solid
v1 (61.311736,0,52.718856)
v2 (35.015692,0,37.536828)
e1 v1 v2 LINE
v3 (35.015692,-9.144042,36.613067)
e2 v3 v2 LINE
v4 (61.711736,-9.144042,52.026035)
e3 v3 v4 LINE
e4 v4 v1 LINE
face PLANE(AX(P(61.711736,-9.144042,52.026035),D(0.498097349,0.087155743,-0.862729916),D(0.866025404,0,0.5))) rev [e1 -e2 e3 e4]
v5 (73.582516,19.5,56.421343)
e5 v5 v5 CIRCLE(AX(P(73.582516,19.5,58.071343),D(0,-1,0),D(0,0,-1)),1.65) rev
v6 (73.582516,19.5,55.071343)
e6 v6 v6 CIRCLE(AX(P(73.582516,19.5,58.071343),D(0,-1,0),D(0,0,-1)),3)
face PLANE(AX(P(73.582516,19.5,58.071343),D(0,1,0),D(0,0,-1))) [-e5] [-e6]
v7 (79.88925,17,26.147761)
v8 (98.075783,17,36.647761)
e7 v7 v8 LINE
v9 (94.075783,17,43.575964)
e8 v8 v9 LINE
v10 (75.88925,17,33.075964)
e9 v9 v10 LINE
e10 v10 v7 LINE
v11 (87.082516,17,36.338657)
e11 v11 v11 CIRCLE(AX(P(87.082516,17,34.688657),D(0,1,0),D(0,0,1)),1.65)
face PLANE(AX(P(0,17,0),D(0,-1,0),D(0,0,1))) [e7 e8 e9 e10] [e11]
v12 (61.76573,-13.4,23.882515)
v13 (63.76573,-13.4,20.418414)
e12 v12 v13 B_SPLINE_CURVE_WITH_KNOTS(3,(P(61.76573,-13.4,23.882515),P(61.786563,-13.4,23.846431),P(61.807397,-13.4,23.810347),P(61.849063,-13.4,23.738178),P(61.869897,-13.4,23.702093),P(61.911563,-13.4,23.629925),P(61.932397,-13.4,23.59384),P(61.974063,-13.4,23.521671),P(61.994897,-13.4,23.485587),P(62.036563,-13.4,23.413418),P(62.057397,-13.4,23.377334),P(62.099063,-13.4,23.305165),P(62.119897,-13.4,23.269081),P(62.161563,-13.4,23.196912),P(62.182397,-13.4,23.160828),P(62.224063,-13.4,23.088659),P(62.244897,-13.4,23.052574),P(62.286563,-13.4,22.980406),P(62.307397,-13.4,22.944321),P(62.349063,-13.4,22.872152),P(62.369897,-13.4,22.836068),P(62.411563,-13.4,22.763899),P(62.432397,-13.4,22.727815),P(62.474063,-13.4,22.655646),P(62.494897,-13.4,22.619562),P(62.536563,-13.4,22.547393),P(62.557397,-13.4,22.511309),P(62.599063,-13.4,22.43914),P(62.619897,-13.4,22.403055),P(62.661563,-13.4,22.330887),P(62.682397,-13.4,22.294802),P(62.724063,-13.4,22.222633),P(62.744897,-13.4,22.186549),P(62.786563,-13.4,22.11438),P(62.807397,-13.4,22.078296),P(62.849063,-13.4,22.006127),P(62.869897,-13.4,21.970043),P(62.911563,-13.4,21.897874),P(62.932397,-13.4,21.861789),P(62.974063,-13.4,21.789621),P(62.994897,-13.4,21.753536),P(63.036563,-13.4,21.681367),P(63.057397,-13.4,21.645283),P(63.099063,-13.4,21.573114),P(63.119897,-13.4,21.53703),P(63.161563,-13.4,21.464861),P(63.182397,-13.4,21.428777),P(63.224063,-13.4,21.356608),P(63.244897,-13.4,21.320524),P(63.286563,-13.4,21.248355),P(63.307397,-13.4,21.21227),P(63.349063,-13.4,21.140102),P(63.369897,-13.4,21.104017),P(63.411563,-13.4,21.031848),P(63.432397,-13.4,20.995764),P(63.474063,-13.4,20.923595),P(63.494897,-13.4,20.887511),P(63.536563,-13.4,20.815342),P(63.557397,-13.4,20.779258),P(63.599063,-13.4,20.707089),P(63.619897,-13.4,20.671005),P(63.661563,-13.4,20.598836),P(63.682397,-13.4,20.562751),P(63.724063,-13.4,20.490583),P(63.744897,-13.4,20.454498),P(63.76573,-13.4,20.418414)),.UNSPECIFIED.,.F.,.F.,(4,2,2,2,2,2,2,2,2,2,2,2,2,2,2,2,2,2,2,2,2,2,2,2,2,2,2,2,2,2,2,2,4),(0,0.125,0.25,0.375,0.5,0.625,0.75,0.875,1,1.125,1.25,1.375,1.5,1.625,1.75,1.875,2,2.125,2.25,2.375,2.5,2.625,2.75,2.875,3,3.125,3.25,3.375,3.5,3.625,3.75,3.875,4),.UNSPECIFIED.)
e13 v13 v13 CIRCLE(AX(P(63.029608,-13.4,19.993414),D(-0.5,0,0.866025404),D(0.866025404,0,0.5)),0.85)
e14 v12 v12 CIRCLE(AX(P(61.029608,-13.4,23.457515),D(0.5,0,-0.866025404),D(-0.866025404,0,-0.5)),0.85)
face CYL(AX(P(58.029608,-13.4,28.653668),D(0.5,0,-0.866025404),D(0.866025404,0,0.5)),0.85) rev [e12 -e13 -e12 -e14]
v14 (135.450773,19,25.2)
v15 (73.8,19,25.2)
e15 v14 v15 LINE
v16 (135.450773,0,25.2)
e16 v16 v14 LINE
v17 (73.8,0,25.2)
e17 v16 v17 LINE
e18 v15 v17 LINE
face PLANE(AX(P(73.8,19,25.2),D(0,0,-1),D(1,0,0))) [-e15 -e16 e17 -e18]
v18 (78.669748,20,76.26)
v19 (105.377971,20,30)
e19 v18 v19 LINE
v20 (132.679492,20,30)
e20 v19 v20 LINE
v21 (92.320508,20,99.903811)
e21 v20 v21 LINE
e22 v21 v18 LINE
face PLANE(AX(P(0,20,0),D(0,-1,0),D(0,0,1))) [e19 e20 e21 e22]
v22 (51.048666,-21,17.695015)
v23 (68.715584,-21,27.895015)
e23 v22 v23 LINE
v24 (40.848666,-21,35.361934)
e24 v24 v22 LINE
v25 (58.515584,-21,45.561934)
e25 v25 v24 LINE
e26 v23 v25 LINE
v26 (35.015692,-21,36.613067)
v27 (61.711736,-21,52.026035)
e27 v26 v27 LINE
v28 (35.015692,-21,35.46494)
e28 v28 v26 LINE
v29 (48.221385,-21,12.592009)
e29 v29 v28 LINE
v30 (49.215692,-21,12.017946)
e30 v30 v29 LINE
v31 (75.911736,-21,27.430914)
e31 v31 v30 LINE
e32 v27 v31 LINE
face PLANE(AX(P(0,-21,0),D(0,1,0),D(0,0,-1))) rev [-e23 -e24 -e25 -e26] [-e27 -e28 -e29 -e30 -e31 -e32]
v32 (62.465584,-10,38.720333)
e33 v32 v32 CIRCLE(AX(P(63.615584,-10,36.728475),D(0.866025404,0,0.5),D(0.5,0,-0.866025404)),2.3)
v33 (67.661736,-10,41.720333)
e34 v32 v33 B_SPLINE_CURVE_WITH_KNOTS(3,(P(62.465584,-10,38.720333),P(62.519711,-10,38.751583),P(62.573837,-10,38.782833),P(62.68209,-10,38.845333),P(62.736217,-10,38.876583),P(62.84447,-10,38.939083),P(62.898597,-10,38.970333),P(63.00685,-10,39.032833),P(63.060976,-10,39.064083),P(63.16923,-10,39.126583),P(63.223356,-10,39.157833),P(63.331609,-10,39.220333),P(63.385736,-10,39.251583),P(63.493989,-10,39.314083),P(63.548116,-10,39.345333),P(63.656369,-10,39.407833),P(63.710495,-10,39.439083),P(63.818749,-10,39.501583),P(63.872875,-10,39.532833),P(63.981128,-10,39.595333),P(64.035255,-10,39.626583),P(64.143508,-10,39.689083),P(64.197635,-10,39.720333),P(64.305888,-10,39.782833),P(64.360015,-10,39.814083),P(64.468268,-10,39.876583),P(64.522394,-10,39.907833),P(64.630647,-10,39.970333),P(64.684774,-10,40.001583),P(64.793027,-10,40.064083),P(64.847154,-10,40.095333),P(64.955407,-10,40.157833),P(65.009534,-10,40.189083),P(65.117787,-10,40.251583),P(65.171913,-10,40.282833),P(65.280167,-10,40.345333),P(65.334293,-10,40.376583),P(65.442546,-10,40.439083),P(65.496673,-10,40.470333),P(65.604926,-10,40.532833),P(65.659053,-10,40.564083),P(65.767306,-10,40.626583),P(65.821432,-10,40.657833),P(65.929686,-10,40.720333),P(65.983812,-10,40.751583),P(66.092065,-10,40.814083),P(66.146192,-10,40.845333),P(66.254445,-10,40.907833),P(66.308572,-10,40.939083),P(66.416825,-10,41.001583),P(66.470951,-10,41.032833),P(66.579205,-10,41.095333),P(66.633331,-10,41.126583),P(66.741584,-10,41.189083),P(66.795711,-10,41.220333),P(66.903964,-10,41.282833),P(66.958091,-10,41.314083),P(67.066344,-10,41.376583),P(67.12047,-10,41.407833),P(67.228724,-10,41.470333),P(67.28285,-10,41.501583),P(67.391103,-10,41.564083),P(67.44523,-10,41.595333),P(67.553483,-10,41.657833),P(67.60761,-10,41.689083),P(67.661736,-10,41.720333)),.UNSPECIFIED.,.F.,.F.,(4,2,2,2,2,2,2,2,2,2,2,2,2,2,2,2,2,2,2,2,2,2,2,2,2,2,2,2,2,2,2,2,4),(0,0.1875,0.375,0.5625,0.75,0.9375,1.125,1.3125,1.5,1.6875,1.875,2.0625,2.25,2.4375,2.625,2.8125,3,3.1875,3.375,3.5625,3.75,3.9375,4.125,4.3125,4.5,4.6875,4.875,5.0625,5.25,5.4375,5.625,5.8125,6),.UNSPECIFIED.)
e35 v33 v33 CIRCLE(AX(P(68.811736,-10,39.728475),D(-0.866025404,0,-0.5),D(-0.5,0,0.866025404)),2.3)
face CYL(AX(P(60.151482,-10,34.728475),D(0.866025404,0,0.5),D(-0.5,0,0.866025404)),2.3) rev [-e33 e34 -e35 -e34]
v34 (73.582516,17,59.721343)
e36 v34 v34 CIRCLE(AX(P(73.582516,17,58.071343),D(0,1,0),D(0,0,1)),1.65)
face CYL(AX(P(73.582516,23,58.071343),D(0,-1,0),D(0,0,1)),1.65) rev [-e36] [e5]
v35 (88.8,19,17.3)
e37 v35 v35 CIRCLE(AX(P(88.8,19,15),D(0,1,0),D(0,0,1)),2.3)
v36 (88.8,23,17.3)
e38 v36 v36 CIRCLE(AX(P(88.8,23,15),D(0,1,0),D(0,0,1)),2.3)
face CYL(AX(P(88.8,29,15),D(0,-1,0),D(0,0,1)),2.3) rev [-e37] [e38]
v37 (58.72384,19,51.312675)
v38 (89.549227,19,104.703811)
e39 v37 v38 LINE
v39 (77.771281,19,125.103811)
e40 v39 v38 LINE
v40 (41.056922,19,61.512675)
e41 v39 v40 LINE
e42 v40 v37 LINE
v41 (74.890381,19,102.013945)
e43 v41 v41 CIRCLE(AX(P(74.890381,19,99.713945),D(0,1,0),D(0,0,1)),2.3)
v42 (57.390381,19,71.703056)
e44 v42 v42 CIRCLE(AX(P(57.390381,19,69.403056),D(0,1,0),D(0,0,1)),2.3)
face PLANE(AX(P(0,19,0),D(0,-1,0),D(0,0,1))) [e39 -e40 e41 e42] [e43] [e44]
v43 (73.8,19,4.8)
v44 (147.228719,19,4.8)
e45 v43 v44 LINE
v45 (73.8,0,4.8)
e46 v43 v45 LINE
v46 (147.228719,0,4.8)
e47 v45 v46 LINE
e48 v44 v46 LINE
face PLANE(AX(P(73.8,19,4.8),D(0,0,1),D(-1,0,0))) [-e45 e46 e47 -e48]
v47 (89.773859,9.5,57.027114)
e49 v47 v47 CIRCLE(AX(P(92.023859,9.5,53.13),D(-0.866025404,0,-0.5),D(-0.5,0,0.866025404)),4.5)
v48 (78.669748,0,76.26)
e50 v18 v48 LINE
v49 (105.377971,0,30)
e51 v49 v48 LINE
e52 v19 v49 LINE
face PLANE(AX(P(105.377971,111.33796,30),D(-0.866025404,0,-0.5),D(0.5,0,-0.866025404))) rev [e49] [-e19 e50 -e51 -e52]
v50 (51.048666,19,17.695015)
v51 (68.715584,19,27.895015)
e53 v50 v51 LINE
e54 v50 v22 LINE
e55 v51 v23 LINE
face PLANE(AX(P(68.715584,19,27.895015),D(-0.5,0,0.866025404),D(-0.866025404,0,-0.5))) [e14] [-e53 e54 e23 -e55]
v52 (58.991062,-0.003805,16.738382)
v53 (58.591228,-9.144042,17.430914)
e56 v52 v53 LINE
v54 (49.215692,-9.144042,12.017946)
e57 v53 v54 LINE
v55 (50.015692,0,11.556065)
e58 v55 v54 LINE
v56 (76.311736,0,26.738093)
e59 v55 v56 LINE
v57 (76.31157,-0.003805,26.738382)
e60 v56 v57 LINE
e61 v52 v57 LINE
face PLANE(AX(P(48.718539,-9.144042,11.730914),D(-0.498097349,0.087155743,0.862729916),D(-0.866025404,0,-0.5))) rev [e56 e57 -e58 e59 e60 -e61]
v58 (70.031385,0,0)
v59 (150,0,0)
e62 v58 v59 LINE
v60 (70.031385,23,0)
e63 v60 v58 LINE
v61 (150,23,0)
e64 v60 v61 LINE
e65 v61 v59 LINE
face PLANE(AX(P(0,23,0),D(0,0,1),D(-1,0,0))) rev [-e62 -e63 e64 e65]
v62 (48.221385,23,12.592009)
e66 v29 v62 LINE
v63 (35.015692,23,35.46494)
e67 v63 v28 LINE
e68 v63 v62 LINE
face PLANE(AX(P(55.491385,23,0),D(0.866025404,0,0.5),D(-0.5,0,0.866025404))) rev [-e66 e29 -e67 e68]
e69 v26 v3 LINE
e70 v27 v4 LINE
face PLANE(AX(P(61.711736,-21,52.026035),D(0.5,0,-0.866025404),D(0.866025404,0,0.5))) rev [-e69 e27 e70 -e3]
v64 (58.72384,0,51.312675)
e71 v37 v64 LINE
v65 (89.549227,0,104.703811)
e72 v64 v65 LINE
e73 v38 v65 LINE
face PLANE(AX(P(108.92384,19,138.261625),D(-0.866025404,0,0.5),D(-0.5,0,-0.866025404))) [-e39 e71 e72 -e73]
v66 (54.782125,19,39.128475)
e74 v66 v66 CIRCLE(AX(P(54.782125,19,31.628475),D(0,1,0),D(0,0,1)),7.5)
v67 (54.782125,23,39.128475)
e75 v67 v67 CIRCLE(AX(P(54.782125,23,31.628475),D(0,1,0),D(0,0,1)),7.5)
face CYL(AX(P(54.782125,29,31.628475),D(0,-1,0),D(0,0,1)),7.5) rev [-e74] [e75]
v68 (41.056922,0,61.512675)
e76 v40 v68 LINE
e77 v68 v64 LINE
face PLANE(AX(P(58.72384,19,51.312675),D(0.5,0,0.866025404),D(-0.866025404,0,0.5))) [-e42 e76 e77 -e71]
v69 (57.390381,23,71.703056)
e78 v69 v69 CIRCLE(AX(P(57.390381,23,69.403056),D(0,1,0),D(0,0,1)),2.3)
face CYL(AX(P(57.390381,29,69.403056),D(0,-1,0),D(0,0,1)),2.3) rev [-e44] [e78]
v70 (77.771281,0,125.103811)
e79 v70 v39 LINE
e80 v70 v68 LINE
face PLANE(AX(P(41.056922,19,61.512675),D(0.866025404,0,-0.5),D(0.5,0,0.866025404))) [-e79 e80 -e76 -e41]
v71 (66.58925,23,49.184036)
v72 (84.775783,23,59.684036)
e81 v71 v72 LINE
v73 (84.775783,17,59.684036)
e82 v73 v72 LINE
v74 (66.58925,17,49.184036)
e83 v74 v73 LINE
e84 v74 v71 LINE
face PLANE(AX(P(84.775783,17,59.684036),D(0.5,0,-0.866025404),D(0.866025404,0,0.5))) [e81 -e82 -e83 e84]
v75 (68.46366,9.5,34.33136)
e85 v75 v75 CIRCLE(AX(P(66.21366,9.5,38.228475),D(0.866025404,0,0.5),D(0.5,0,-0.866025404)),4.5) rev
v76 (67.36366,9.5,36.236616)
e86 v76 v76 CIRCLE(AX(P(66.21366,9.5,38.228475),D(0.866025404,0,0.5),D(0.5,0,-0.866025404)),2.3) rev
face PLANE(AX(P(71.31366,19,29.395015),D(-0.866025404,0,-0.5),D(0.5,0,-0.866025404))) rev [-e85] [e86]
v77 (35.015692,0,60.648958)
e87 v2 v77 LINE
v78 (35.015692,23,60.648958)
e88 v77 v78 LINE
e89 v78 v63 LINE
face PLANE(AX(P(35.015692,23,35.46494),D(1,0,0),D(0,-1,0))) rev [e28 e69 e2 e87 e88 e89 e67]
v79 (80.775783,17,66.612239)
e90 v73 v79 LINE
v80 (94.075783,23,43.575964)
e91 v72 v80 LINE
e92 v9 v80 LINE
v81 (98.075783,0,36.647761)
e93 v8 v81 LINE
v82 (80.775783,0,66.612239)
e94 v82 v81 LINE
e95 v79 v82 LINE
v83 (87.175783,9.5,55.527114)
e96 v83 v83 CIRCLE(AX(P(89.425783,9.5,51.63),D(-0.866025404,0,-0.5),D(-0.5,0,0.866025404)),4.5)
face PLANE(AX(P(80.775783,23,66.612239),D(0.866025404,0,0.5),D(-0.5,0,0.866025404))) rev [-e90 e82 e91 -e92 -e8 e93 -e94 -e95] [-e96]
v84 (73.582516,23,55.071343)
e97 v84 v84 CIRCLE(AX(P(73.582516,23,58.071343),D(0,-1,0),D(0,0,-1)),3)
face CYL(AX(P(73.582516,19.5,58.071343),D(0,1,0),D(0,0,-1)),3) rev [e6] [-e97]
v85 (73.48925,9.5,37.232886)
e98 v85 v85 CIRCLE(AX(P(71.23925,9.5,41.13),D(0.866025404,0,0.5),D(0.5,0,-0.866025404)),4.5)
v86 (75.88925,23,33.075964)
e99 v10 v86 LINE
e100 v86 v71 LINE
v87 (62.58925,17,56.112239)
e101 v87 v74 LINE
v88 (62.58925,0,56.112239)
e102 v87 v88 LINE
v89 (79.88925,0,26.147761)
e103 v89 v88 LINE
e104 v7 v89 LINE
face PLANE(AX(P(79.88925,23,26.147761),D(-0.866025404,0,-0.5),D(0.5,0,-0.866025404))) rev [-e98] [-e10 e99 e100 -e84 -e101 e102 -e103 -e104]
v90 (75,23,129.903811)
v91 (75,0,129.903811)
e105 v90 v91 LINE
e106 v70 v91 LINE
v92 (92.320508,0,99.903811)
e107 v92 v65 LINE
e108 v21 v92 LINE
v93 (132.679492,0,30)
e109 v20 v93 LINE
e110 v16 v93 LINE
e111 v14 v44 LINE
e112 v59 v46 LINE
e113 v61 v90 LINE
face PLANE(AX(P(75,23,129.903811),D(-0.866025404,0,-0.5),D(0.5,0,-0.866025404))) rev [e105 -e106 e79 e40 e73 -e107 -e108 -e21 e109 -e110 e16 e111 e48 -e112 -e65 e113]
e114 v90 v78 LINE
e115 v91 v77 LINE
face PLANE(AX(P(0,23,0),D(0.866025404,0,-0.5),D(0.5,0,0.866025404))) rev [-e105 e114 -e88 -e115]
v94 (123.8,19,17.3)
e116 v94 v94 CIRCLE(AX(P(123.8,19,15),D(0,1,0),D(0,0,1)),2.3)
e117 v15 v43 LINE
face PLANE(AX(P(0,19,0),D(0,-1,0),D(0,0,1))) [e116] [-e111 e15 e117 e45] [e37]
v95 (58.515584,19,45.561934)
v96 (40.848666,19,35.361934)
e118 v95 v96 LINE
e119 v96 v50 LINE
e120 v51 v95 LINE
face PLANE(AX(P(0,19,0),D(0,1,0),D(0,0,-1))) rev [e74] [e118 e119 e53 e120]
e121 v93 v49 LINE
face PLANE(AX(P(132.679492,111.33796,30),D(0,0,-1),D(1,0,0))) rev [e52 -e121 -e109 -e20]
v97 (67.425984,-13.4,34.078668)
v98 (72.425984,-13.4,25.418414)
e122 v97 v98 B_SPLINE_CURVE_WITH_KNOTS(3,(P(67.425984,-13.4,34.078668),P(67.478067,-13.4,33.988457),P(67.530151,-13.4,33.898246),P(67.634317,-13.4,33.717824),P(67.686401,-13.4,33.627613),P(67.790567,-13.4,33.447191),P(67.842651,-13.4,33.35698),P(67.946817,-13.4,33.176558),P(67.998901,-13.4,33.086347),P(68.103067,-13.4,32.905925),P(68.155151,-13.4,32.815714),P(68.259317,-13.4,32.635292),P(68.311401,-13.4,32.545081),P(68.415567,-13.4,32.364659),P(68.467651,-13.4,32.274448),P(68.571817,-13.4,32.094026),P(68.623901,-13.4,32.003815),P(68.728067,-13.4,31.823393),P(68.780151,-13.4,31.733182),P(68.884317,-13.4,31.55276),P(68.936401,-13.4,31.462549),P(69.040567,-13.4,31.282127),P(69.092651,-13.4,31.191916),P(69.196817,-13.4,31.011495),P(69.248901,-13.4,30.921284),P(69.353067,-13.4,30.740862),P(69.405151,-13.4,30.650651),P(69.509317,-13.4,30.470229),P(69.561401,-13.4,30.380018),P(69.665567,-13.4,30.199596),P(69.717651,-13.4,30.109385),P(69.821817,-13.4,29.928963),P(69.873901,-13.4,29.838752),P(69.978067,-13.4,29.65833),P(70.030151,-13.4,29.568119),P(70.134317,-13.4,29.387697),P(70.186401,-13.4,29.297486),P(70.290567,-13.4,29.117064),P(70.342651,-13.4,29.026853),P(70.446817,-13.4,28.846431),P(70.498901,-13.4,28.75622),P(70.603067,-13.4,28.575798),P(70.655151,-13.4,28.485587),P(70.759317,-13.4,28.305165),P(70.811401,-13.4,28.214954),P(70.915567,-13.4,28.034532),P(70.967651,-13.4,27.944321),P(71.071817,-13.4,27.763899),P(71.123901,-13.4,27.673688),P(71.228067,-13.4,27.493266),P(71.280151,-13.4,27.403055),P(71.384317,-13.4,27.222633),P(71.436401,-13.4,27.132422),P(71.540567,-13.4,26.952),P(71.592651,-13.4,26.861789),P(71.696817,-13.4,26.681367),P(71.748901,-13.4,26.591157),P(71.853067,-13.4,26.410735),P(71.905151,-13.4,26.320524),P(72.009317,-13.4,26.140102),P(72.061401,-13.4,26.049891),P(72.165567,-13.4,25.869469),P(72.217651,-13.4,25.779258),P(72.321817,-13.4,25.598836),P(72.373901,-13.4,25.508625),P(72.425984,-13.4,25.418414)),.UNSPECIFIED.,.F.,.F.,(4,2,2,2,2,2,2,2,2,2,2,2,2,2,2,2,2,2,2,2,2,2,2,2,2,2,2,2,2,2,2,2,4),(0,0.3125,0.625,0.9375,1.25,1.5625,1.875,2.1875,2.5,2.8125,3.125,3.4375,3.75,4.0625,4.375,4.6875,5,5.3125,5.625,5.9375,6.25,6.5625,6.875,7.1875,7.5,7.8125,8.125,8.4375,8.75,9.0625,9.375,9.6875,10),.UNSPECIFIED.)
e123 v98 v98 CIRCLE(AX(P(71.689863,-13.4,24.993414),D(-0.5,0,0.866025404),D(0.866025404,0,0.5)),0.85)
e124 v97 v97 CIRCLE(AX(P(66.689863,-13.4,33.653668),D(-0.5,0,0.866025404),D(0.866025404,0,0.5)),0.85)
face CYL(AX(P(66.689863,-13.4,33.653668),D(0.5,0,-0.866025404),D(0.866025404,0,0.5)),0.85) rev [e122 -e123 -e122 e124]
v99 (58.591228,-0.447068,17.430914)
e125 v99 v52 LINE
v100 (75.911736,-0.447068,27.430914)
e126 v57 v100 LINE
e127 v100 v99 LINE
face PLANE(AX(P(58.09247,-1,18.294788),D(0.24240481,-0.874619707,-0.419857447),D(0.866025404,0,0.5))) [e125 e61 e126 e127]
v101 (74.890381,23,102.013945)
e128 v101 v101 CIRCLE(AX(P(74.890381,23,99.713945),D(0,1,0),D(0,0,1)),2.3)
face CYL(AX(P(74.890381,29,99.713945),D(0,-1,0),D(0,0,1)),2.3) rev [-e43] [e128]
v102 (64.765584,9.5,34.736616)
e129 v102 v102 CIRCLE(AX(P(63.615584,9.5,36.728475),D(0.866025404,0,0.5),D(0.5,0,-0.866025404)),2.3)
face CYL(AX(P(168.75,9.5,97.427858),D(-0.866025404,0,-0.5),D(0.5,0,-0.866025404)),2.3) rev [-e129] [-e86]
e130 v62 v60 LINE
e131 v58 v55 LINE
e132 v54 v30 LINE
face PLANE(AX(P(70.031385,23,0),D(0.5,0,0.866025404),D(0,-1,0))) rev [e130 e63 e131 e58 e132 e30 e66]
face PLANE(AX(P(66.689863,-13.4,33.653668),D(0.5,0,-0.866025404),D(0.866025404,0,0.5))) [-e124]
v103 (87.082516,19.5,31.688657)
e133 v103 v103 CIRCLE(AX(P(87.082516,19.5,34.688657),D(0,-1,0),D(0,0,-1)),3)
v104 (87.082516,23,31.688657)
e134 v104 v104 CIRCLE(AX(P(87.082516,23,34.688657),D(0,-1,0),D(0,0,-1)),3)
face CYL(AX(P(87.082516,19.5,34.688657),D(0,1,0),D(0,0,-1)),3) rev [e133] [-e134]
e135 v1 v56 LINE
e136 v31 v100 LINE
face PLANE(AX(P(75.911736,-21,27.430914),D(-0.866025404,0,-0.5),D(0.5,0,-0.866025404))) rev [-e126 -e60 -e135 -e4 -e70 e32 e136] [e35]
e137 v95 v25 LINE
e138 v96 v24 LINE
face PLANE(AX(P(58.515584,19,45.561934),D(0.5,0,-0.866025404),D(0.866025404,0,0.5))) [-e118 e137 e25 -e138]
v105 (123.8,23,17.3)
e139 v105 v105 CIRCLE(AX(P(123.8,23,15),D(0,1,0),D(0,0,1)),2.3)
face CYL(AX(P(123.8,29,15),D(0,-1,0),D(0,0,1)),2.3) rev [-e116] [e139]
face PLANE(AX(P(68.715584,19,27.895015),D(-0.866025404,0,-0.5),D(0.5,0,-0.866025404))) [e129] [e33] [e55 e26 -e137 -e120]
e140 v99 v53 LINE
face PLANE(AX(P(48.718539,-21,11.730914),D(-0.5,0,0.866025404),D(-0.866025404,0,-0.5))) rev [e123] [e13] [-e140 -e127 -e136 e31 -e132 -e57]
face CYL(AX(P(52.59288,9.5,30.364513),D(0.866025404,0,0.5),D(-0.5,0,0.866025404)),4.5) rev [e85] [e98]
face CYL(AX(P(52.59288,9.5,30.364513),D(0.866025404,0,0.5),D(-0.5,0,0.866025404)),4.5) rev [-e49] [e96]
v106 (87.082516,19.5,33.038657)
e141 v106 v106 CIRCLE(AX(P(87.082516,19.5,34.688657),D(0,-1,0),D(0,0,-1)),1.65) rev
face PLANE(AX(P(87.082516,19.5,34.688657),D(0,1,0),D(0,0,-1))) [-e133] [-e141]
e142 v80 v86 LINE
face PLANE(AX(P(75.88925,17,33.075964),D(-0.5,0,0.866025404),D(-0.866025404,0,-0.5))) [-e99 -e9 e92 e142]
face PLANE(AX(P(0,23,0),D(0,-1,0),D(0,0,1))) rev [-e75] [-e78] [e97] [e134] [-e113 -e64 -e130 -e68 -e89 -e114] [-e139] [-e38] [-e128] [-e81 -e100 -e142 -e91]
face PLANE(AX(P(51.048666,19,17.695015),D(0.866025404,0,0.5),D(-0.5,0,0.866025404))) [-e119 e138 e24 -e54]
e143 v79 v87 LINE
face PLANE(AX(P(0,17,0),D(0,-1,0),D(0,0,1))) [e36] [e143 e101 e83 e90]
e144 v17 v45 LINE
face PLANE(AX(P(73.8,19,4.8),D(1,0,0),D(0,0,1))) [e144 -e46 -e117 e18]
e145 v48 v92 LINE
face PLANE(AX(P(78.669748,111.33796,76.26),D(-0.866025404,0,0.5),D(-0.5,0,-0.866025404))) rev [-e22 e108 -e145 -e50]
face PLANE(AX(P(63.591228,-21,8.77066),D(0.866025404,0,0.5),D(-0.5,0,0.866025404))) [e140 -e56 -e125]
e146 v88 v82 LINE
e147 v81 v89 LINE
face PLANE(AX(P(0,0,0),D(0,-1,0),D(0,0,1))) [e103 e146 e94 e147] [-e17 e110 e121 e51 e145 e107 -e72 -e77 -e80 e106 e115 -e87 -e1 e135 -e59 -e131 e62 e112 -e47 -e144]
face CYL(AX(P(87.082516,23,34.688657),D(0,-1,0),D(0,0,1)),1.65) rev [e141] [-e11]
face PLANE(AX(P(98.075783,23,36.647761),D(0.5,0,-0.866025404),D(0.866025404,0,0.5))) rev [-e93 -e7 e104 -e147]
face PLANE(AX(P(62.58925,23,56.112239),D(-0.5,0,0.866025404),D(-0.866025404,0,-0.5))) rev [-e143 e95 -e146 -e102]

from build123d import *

# Parameters (mm, degrees)
BOSS_EXTRUDE1_DEPTH      = 23
SKETCH2_W                = 100.39999999999999
SKETCH2_H                = 20.400000000000002
CUT_EXTRUDE2_DEPTH       = 19
CUT_EXTRUDE3_DEPTH       = 19
CUT_EXTRUDE11_DEPTH      = 200.75985582694003
CUT_EXTRUDE11_DEPTH_BACK = 200.75985582694003
CUT_EXTRUDE10_DEPTH      = 20
SKETCH38_R               = 2.299999999999993
SKETCH38_R_2             = 2.300000000000006
SKETCH38_R_3             = 2.2999999999999985
SKETCH38_R_4             = 2.299999999999992
CUT_EXTRUDE24_DEPTH      = 10
BOSS_EXTRUDE2_DEPTH      = 6
SKETCH40_R               = 1.6500000000000017
CUT_EXTRUDE25_DEPTH      = 200.1582285520733
SKETCH41_R               = 3.0000000000000084
CUT_EXTRUDE26_DEPTH      = 3.5
SKETCH45_R               = 2.3
CUT_EXTRUDE29_DEPTH      = 130.1236252028075
SKETCH47_R               = 7.499999999999999
CUT_EXTRUDE31_DEPTH      = 10
CUT_EXTRUDE32_DEPTH      = 200.75985582694003
BOSS_EXTRUDE3_DEPTH      = 21
CUT_EXTRUDE33_DEPTH      = 200.75985582694003
CHAMFER6_SIZE            = 0.8
CHAMFER6_SIZE2           = 9.144041842209413
SKETCH51_R               = 4.5
CUT_EXTRUDE34_DEPTH      = 29.803050969
SKETCH52_R               = 2.3
CUT_EXTRUDE35_DEPTH      = 10
SKETCH53_W               = 20.000000000000007
SKETCH53_H               = 20
CUT_EXTRUDE36_DEPTH      = 10
SKETCH54_R               = 0.8500000000000069
CUT_EXTRUDE37_DEPTH      = 10
CHAMFER7_SIZE            = 1
CHAMFER7_SIZE_2          = 1.710027066
CHAMFER5_SIZE            = 14.54
CHAMFER4_SIZE            = 14.54


with BuildPart() as part:
    # Sketch1 → Boss-Extrude1 (new body)
    with BuildSketch(Plane(origin=(0, 0, 0), x_dir=(1, 0, 0), z_dir=(0, 1, 0))):
        Polygon((0, 0), (149.99999999999937, 0), (74.99999999999966, 129.903810567666), align=None)
    extrude(amount=BOSS_EXTRUDE1_DEPTH)

    # Sketch2 → Cut-Extrude2 (cut)
    with BuildSketch(Plane(origin=(0, 0, 0), x_dir=(1, 0, 0), z_dir=(0, 1, 0))):
        Polygon((108.9238401753675, 138.2616253392494), (58.72384017536752, 51.31267479929176), (41.05692193816496, 61.51267479929177), (91.25692193816495, 148.4616253392494), align=None)
        with Locations((124, 15.000000000000002)):
            Rectangle(SKETCH2_W, SKETCH2_H)
    extrude(amount=CUT_EXTRUDE2_DEPTH, mode=Mode.SUBTRACT)

    # Sketch4 → Cut-Extrude3 (cut)
    with BuildSketch(Plane(origin=(0, 0, 0), x_dir=(1, 0, 0), z_dir=(0, 1, 0))):
        Polygon((58.51558394542647, 45.56193363414623), (40.84866570822394, 35.36193363414623), (51.048665708223936, 17.69501539694368), (68.71558394542647, 27.895015396943673), align=None)
    extrude(amount=CUT_EXTRUDE3_DEPTH, mode=Mode.SUBTRACT)

    # Sketch22 → Cut-Extrude11 (cut, two sides: drawn at the far end of the back side and taken through both)
    with BuildSketch(Plane.XZ.offset(-CUT_EXTRUDE11_DEPTH_BACK)):
        Polygon((79.88924971530794, -26.147760514529192), (62.58924971530795, -56.11223948547077), (80.77578319478118, -66.61223948547077), (98.07578319478117, -36.64776051452918), align=None)
    extrude(amount=CUT_EXTRUDE11_DEPTH + CUT_EXTRUDE11_DEPTH_BACK, mode=Mode.SUBTRACT)

    # Sketch21 → Cut-Extrude10 (cut)
    with BuildSketch(Plane.XZ):
        Polygon((132.67949192431067, -29.999999999999993), (105.37797113249052, -29.999999999999993), (78.6697476797782, -76.26000000000042), (92.32050807568827, -99.90381056766569), align=None)
    extrude(amount=-CUT_EXTRUDE10_DEPTH, mode=Mode.SUBTRACT)

    # Sketch38 → Cut-Extrude24 (cut)
    with BuildSketch(Plane.XZ.offset(-19)):
        with Locations(Location((88.79999999999998, -15, 0), (0, 0, 270))):
            Circle(SKETCH38_R)
        with Locations(Location((123.8, -15, 0), (0, 0, 270))):
            Circle(SKETCH38_R_2)
        with Locations(Location((57.390381056766245, -69.40305585605834, 0), (0, 0, 270))):
            Circle(SKETCH38_R_3)
        with Locations(Location((74.89038105676623, -99.7139449885137, 0), (0, 0, 270))):
            Circle(SKETCH38_R_4)
    extrude(amount=-CUT_EXTRUDE24_DEPTH, mode=Mode.SUBTRACT)

    # Sketch39 → Boss-Extrude2 (add)
    with BuildSketch(Plane(origin=(0, 23, 0), x_dir=(1, 0, 0), z_dir=(0, 1, 0))):
        Polygon((62.58924971530795, 56.11223948547077), (80.77578319478118, 66.61223948547077), (84.77578319478118, 59.68403625519526), (66.58924971530797, 49.18403625519524), align=None)
        Polygon((98.07578319478117, 36.64776051452918), (79.88924971530794, 26.147760514529192), (75.88924971530795, 33.0759637448047), (94.07578319478117, 43.575963744804696), align=None)
    extrude(amount=-BOSS_EXTRUDE2_DEPTH)

    # Sketch40 → Cut-Extrude25 (cut, through all)
    with BuildSketch(Plane.XZ.offset(-17)):
        with Locations(Location((87.08251645504455, -34.68865704891005, 0), (0, 0, 270))):
            Circle(SKETCH40_R)
        with Locations(Location((73.58251645504457, -58.071342951089896, 0), (0, 0, 270))):
            Circle(SKETCH40_R)
    extrude(amount=-CUT_EXTRUDE25_DEPTH, mode=Mode.SUBTRACT)

    # Sketch41 → Cut-Extrude26 (cut)
    with BuildSketch(Plane(origin=(0, 23, 0), x_dir=(1, 0, 0), z_dir=(0, 1, 0))):
        with Locations(Location((73.58251645504457, 58.071342951089896, 0), (0, 0, 270))):
            Circle(SKETCH41_R)
        with Locations(Location((87.08251645504455, 34.68865704891005, 0), (0, 0, 270))):
            Circle(SKETCH41_R)
    extrude(amount=-CUT_EXTRUDE26_DEPTH, mode=Mode.SUBTRACT)

    # Sketch45 → Cut-Extrude29 (cut, through all)
    with BuildSketch(Plane(origin=(63.615583945425506, 0, -36.72847451554663), x_dir=(0.5, 0, 0.8660254037844386), z_dir=(-0.8660254037844387, 0, 0.5000000000000001))):
        with Locations((1.94809e-12, 9.5)):
            Circle(SKETCH45_R)
    extrude(amount=-CUT_EXTRUDE29_DEPTH, mode=Mode.SUBTRACT)

    # Sketch47 → Cut-Extrude31 (cut)
    with BuildSketch(Plane.XZ.offset(-19)):
        with Locations(Location((54.78212482682521, -31.62847451554496, 0), (0, 0, 270))):
            Circle(SKETCH47_R)
    extrude(amount=-CUT_EXTRUDE31_DEPTH, mode=Mode.SUBTRACT)

    # Sketch48 → Cut-Extrude32 (cut, through all)
    with BuildSketch(Plane.XZ):
        Polygon((55.491384919067684, 2e-17), (27.74569245953363, -48.05694903109369), (0, 0), align=None)
    extrude(amount=-CUT_EXTRUDE32_DEPTH, mode=Mode.SUBTRACT)

    # Sketch49 → Boss-Extrude3 (add)
    with BuildSketch(Plane.XZ):
        Polygon((48.718538689301745, -11.730913781805928), (75.91173636813312, -27.430913781805906), (61.7117363681331, -52.026035249283986), (34.51853868930174, -36.326035249284), align=None)
    extrude(amount=BOSS_EXTRUDE3_DEPTH)

    # Sketch50 → Cut-Extrude33 (cut, through all)
    with BuildSketch(Plane(origin=(0, 0, 0), x_dir=(1, 0, 0), z_dir=(0, 1, 0))):
        Polygon((40.84866570822394, 35.36193363414623), (58.51558394542647, 45.56193363414623), (68.71558394542649, 27.895015396943673), (51.048665708223936, 17.69501539694368), align=None)
    extrude(amount=-CUT_EXTRUDE33_DEPTH, mode=Mode.SUBTRACT)

    # Chamfer6
    chamfer6_edges = [part.edges().sort_by_distance(p)[0] for p in [
        (48.115137528717426, 0, -44.17603524928399),
        (62.31513752871743, 0, -19.58091378180592),
    ]]
    chamfer6_side = [part.faces().sort_by_distance(p)[0] for p in [
        (48.99845735329998, 0, -54.86781762841321),
    ]]
    chamfer(chamfer6_edges, length=CHAMFER6_SIZE, length2=CHAMFER6_SIZE2, reference=chamfer6_side[0])

    # Sketch51 → Cut-Extrude34 (cut)
    with BuildSketch(Plane(origin=(92.02385940613446, 0, -53.129999999999995), x_dir=(-0.4999999999999997, 0, -0.8660254037844388), z_dir=(0.8660254037844388, 0, -0.4999999999999997))):
        with Locations(Location((-1.92901e-12, 9.5, 0), (0, 0, 180))):
            Circle(SKETCH51_R)
    extrude(amount=-CUT_EXTRUDE34_DEPTH, mode=Mode.SUBTRACT)

    # Sketch52 → Cut-Extrude35 (cut)
    with BuildSketch(Plane(origin=(68.8117363681321, 0, -39.72847451554662), x_dir=(-0.49999999999999983, 0, -0.8660254037844387), z_dir=(0.8660254037844387, 0, -0.49999999999999983))):
        with Locations((-1.388e-14, -10)):
            Circle(SKETCH52_R)
    extrude(amount=-CUT_EXTRUDE35_DEPTH, mode=Mode.SUBTRACT)

    # Sketch53 → Cut-Extrude36 (cut)
    with BuildSketch(Plane(origin=(7.10000000000096, 0, 12.297560733740706), x_dir=(0.8660254037844387, 0, -0.49999999999999983), z_dir=(0.49999999999999983, 0, 0.8660254037844387))):
        with Locations((69.45694903109329, -11)):
            Rectangle(SKETCH53_W, SKETCH53_H)
    extrude(amount=CUT_EXTRUDE36_DEPTH, mode=Mode.SUBTRACT)

    # Sketch54 → Cut-Extrude37 (cut)
    with BuildSketch(Plane(origin=(7.10000000000096, 0, 12.297560733740706), x_dir=(0.8660254037844387, 0, -0.49999999999999983), z_dir=(0.49999999999999983, 0, 0.8660254037844387))):
        with Locations((64.5819490310929, -13.3999999999983)):
            Circle(SKETCH54_R)
        with Locations((74.58194903109292, -13.399999999998368)):
            Circle(SKETCH54_R)
    extrude(amount=-CUT_EXTRUDE37_DEPTH, mode=Mode.SUBTRACT)

    # Chamfer7
    # the kernel refuses this chamfer: 1.710027066, 1 mm, written as the material it takes off along each edge
    with BuildSketch(Plane(origin=(80.10050658552632, -1.0000000000000009, -29.026564170563404), x_dir=(0.07067759261755262, 0.9899589444048419, 0.12241718137025635), z_dir=(-0.866025403784439, 0, 0.49999999999999933))) as chamfer7_piece_1_section:
        Polygon((CHAMFER7_SIZE * 0.998511767905, CHAMFER7_SIZE * 0.0545366789897), (-CHAMFER7_SIZE_2 * 0.141355185248, CHAMFER7_SIZE_2 * 0.989958944496), (0, 0), align=None)
    chamfer7_piece_1 = extrude(amount=24.42540661325694, mode=Mode.PRIVATE)
    chamfer7_piece_1 = split(chamfer7_piece_1, bisect_by=Plane(origin=(69.16773960486616, -0.5972584462527297, -23.537265435119764), z_dir=(0.4999999999999995, 0, 0.866025403784439)), keep=Keep.TOP, mode=Mode.PRIVATE)
    add(chamfer7_piece_1, mode=Mode.SUBTRACT)

    # Chamfer5
    chamfer5_edges = [part.edges().sort_by_distance(p)[0] for p in [
        (55.491384919067684, 11.5, 2e-17),
    ]]
    chamfer(chamfer5_edges, length=CHAMFER5_SIZE)

    # Chamfer4
    chamfer4_edges = [part.edges().sort_by_distance(p)[0] for p in [
        (27.74569245953363, 11.5, -48.05694903109369),
    ]]
    chamfer(chamfer4_edges, length=CHAMFER4_SIZE)


with BuildPart() as body_2:
    # Mirror1: mirrored copy
    add(part.part.mirror(Plane.XY))


solid = body_2.part
